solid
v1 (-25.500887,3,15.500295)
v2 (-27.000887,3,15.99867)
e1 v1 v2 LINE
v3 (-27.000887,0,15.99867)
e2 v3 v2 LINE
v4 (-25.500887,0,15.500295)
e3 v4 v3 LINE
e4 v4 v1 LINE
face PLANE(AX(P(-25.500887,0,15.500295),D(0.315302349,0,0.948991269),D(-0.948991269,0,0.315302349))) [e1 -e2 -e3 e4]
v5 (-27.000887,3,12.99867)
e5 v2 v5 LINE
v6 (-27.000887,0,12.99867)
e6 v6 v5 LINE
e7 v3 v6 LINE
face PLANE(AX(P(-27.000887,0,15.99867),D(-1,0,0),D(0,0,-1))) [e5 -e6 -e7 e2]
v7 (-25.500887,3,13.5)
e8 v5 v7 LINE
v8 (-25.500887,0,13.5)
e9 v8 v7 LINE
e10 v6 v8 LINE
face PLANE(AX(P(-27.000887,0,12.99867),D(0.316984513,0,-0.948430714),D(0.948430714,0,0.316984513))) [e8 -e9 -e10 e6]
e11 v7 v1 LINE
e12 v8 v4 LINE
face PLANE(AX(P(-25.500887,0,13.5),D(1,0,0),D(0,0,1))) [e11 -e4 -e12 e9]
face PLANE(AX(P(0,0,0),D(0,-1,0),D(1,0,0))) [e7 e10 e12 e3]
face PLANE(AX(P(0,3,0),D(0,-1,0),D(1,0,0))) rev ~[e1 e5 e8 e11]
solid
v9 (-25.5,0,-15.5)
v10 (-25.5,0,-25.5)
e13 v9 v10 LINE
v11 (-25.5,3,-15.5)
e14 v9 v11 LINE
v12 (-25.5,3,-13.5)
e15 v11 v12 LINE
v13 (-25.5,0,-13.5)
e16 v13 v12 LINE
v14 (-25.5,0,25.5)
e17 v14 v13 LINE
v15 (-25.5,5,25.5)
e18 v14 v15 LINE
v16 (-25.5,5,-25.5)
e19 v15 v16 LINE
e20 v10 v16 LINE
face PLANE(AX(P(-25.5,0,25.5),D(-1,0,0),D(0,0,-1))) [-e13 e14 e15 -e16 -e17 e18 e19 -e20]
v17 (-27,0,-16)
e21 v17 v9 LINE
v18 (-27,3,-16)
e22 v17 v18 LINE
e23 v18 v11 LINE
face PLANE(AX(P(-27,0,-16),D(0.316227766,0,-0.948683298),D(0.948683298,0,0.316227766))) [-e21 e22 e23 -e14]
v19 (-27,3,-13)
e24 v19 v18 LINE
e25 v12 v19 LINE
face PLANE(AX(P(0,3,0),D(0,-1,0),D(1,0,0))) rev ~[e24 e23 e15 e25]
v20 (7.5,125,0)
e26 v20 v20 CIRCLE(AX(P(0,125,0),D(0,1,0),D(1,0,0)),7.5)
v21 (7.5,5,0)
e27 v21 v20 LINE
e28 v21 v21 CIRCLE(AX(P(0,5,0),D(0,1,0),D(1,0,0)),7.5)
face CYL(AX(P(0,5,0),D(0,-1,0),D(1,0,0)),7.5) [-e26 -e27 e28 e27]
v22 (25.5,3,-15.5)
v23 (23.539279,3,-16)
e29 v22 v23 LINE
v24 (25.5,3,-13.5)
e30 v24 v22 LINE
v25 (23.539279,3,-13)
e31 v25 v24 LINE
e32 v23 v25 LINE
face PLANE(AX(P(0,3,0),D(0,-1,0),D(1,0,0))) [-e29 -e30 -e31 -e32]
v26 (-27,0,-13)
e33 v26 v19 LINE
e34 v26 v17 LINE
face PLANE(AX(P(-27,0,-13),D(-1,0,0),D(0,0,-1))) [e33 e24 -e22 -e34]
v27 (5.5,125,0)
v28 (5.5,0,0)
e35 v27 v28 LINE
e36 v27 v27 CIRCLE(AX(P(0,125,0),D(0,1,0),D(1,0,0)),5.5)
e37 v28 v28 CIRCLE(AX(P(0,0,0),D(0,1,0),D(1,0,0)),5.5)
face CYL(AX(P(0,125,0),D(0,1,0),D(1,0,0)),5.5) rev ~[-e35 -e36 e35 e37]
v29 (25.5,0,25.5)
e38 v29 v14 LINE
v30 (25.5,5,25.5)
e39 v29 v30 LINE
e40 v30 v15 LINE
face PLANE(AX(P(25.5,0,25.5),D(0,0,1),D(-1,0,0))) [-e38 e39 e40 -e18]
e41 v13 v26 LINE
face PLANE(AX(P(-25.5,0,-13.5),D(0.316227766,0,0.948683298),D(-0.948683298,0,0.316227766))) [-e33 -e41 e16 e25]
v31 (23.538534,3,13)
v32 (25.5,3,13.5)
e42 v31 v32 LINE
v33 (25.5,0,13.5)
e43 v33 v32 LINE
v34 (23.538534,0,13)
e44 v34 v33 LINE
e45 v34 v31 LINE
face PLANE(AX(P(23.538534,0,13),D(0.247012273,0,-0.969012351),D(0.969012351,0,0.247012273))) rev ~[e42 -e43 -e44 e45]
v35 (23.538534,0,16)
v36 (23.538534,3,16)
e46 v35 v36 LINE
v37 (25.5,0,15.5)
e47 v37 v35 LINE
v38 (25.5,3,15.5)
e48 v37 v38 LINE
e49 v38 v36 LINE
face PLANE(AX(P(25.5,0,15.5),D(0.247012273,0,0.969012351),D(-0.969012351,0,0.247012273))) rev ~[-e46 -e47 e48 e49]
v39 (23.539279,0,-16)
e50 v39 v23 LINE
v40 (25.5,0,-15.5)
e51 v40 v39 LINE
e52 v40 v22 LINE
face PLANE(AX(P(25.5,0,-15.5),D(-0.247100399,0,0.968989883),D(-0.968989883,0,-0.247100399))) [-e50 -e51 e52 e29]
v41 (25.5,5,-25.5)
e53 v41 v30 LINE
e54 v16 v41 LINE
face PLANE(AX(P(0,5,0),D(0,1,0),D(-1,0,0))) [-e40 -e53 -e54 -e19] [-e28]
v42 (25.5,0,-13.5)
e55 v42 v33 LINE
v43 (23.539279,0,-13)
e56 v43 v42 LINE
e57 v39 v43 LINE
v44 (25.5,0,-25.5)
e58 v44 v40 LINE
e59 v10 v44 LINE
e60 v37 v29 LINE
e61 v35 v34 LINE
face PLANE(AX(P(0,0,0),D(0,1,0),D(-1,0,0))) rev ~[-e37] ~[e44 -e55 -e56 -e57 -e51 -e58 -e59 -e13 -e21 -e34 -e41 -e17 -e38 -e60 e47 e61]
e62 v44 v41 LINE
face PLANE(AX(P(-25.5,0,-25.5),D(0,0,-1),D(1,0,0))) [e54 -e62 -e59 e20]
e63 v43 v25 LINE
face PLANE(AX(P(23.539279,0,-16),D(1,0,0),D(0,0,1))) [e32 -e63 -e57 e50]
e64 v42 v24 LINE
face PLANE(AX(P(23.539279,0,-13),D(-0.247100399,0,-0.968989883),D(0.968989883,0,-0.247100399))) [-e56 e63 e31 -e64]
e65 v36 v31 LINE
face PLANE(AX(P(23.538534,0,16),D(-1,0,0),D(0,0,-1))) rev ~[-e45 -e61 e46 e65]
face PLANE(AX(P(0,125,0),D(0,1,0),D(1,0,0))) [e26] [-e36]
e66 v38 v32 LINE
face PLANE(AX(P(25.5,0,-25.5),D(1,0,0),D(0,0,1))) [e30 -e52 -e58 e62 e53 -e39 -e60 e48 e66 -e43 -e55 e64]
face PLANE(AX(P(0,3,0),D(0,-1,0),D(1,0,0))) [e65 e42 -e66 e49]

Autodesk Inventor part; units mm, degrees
ref_plane "YZ Plane" through (0, 0, 0) normal (1, 0, 0) x (0, 1, 0)
ref_plane "XZ Plane" through (0, 0, 0) normal (0, 1, 0) x (-1, 0, 0)
ref_plane "XY Plane" through (0, 0, 0) normal (0, 0, 1) x (1, 0, 0)
sketch "Sketch1" plane through (0, 0, 0) normal (0, 1, 0) x (-1, 0, 0)
  line L0 (25.5, -25.5) -> (-25.5, -25.5)
  line L1 (-25.5, -25.5) -> (-25.5, 25.5)
  line L2 (-25.5, 25.5) -> (25.5, 25.5)
  line L3 (25.5, 25.5) -> (25.5, -25.5)
  line L4 (25.5, -25.5) -> (-25.5, 25.5) construction
  line L5 (-25.5, -25.5) -> (25.5, 25.5) construction
  point P0 (0, 0)
  dimension "d0" = 51
  dimension "d1" = 51
extrude "Extrusion1" add sketch "Sketch1" along normal blind 5
sketch "Sketch2" plane through (0, 5, 0) normal (0, 1, 0) x (1, 0, 0)
  circle A0 centre (0, 0) radius 7.5
  dimension "d4" = 15
extrude "Extrusion2" add sketch "Sketch2" along normal blind 120
sketch "Sketch3" plane through (0, 125, 0) normal (0, 1, 0) x (1, 0, 0)
  circle A0 centre (0, 0) radius 5.5
  dimension "d7" = 11
extrude "Extrusion3" cut sketch "Sketch3" against normal blind 125
sketch "Sketch4" plane through (0, 0, 0) normal (0, -1, 0) x (1, 0, 0)
  line L0 (-25.5, -25.5) -> (-25.5, 25.5)
  line L1 (-25.5, 15.5) -> (-27.000887, 15.99867)
  line L2 (-27.000887, 15.99867) -> (-27.000887, 12.99867)
  line L3 (-27.000887, 12.99867) -> (-25.500887, 13.5)
  line L4 (-25.500887, 13.5) -> (-25.500887, 16.5)
  line L5 (-25.500887, 16.5) -> (-25.500887, 12.844087)
  line L6 (-25.5, -15.5) -> (-27, -16)
  line L7 (-27, -16) -> (-27, -13)
  line L8 (-27, -13) -> (-25.5, -13.5)
  line L9 (-25.5, -15.5) -> (-25.5, -13.5)
  line L10 (-25.5, -25.5) -> (-25.5, 25.5)
  point P0 (0, 0)
  point P1 (-25.500887, 15)
  point P2 (-25.500887, 15.500295)
  dimension "d10" = 3
  dimension "d11" = 3
  dimension "d12" = 2
  dimension "d13" = 1.5
  dimension "d14" = 10
  dimension "d15" = 3
  dimension "d16" = 2
  dimension "d17" = 1.5
  dimension "d18" = 10
  dimension "d19" = 1.5
sketch "Sketch4 outline for Extrusion4" plane through (0, 0, 0) normal (0, -1, 0) x (1, 0, 0)
  line L0 (-27.000887, 15.99867) -> (-27.000887, 12.99867)
  line L1 (-25.500887, 15.500295) -> (-27.000887, 15.99867)
  line L2 (-25.500887, 13.5) -> (-25.500887, 15.500295)
  line L3 (-27.000887, 12.99867) -> (-25.500887, 13.5)
  line L4 (-27, -13) -> (-27, -16)
  line L5 (-25.5, -13.5) -> (-27, -13)
  line L6 (-25.5, -15.5) -> (-25.5, -13.5)
  line L7 (-27, -16) -> (-25.5, -15.5)
extrude "Extrusion4" add sketch "Sketch4 outline for Extrusion4" against normal blind 3
sketch "Sketch5" plane through (0, 0, 0) normal (0, -1, 0) x (1, 0, 0)
  line L0 (25.5, 25.5) -> (25.5, -25.5)
  line L1 (25.5, -15.5) -> (23.539279, -16)
  line L2 (23.539279, -16) -> (23.539279, -13)
  line L3 (23.539279, -13) -> (25.5, -13.5)
  line L4 (25.5, -15.5) -> (25.5, -13.5)
  line L5 (25.5, 15.5) -> (23.538534, 16)
  line L6 (23.538534, 16) -> (23.538534, 13)
  line L7 (23.538534, 13) -> (25.5, 13.5)
  line L8 (25.5, 15.5) -> (25.5, 13.5)
  point P0 (0, 0)
  dimension "d22" = 3
  dimension "d23" = 2
  dimension "d24" = 10
  dimension "d25" = 2
  dimension "d26" = 3
  dimension "d27" = 10
extrude "Extrusion5" cut sketch "Sketch5" against normal blind 3
properties part number "desoldering_wick_stand"
